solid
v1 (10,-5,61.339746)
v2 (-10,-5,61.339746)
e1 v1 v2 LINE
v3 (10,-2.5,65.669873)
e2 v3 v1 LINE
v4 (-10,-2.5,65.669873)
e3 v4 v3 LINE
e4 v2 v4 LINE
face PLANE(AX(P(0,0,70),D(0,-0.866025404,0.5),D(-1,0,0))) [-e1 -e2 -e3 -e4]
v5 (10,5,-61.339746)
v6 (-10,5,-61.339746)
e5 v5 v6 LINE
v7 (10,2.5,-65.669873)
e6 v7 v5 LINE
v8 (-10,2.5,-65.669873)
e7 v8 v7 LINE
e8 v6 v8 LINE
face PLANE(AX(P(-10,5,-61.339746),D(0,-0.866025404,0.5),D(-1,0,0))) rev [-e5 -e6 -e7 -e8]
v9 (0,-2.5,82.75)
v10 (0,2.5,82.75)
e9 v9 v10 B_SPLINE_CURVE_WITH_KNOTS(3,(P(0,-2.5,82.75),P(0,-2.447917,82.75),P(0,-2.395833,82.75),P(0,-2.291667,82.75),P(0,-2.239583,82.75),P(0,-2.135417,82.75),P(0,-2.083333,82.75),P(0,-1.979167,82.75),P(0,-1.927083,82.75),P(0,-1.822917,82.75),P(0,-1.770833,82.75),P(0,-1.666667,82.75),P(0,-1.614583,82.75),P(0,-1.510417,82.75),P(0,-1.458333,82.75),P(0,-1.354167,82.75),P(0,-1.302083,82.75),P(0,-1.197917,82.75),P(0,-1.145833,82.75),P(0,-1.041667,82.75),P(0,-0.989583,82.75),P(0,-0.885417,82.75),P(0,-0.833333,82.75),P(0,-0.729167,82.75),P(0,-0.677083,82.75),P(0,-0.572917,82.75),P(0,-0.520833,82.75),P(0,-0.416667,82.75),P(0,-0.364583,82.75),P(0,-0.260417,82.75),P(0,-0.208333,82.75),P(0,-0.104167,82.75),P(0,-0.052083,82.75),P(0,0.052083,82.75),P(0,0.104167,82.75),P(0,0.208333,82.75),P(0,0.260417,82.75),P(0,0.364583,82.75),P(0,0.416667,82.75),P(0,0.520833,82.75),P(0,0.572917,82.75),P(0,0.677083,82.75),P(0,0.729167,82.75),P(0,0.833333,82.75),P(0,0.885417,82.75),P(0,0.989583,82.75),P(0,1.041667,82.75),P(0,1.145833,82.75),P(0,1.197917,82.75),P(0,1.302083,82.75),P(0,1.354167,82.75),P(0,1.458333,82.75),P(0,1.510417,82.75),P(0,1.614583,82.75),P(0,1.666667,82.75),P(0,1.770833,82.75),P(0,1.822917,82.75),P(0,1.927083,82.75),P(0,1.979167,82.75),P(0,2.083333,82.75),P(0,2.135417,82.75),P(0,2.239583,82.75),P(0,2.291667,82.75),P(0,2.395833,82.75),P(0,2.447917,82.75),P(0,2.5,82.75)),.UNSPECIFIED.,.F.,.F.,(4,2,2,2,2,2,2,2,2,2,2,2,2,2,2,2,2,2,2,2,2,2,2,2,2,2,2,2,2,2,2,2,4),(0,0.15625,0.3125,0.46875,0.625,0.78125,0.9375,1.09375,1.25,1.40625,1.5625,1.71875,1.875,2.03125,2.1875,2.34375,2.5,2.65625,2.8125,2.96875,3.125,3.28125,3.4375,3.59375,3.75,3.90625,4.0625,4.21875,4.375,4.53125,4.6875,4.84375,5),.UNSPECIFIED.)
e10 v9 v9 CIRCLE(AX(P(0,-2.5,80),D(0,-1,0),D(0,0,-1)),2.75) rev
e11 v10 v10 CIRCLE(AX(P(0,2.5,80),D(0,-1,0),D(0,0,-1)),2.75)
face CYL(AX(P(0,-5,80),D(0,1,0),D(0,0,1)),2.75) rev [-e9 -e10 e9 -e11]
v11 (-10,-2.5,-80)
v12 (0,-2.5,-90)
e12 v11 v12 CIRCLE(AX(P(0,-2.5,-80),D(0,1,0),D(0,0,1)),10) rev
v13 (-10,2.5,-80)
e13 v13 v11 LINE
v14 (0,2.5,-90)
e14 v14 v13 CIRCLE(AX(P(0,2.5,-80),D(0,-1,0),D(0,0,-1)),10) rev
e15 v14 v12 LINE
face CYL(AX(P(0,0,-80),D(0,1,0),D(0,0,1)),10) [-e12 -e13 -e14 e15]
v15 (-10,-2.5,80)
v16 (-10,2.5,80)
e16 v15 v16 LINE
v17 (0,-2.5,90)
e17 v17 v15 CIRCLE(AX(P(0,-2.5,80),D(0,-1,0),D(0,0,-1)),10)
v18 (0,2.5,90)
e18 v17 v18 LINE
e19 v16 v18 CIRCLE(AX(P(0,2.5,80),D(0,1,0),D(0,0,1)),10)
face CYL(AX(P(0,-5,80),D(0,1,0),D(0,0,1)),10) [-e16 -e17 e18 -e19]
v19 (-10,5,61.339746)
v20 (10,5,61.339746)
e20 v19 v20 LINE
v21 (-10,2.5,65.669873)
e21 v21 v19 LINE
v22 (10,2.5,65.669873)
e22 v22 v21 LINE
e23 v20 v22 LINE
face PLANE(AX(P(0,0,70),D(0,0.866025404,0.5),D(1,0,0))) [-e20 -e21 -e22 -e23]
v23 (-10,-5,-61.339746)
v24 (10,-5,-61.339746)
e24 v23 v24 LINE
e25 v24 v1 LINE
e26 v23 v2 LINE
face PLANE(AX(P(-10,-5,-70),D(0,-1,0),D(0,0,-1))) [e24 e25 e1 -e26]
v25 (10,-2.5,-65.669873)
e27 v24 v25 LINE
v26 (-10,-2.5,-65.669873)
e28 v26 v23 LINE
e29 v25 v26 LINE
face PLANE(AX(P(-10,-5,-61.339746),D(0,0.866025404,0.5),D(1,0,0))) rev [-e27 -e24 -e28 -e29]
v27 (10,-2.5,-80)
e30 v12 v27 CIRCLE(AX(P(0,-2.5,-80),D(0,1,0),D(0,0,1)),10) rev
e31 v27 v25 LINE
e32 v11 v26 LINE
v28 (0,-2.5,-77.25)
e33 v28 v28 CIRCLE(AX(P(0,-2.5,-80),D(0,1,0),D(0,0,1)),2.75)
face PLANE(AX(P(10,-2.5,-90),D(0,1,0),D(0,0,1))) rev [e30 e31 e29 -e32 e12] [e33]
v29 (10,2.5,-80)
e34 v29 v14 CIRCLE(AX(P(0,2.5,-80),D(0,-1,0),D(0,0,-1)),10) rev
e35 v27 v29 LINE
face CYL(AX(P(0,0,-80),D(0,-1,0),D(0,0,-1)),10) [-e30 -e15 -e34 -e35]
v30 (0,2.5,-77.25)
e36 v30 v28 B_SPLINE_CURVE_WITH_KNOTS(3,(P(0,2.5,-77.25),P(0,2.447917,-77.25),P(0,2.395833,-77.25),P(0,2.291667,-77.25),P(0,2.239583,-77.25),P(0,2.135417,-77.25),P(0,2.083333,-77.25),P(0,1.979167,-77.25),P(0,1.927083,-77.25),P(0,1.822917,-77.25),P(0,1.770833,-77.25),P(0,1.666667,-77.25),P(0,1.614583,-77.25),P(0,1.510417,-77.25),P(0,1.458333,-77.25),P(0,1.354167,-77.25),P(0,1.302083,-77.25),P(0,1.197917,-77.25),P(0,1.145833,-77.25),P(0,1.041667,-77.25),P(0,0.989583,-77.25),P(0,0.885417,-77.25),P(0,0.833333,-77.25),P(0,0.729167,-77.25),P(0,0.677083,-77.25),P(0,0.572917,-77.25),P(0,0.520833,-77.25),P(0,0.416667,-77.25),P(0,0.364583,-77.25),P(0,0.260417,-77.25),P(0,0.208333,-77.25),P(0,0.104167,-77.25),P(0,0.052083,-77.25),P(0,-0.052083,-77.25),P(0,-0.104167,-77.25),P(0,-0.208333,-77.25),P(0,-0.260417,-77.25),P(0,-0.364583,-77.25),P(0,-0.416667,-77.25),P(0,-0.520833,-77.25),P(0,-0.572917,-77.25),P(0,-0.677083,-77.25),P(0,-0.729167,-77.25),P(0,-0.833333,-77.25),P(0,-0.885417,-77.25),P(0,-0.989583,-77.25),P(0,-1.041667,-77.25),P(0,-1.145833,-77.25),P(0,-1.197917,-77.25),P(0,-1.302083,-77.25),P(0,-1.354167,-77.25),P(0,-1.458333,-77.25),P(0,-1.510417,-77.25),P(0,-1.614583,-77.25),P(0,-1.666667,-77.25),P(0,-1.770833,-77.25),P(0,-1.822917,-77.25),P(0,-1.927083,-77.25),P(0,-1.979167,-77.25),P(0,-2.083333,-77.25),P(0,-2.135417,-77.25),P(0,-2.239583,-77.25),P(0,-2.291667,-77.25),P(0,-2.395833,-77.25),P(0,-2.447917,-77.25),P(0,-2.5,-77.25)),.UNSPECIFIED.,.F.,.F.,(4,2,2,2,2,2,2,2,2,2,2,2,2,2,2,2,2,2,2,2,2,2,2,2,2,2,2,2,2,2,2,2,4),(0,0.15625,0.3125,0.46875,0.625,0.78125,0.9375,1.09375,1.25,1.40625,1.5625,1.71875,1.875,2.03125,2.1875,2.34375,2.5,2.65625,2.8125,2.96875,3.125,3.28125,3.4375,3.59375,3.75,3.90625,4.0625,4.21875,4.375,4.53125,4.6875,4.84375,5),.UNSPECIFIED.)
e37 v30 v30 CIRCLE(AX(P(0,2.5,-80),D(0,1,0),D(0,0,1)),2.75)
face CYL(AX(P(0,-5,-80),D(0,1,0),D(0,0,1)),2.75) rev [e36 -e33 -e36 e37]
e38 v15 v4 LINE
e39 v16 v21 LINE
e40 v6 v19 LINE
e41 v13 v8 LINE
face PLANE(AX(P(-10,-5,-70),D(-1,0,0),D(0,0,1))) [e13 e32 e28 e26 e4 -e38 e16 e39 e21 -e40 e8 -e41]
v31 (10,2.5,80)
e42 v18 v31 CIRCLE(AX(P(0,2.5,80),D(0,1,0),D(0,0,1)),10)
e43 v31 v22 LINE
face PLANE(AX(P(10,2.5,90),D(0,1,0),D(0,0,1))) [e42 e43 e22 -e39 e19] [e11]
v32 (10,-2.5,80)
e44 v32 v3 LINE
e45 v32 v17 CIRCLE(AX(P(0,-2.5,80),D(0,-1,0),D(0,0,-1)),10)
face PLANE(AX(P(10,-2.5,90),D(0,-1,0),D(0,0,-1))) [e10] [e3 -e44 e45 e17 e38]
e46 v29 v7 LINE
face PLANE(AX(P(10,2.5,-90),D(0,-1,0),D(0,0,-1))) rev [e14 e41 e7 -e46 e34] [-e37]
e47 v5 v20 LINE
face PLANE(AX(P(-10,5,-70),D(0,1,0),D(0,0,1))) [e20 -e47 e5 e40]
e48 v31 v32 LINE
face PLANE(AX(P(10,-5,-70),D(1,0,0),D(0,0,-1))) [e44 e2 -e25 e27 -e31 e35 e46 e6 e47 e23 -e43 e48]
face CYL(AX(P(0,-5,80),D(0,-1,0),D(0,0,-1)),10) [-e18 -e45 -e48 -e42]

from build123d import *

# Parameters (mm, degrees)
BOSS_EXTRUDE1_DEPTH      = 70
BOSS_EXTRUDE1_DEPTH_BACK = 70
SKETCH1_W                = 20
SKETCH1_H                = 10
SKETCH3_W                = 20
SKETCH3_H                = 5
BOSS_EXTRUDE2_DEPTH      = 20
FILLET1_R                = 10
SKETCH4_R                = 2.75
CUT_EXTRUDE1_DEPTH       = 91.863909227
FILLET1_OF_MIRROR1_R     = 10
CHAMFER1_SIZE            = 8.660254038
CHAMFER1_SIZE_2          = 5


# Some blends are built 0.0001 mm under size
with BuildPart() as part:
    # Sketch1 → Boss-Extrude1 (new, two sides: drawn at the far end of the back side and taken through both)
    with BuildSketch(Plane.XY.offset(-BOSS_EXTRUDE1_DEPTH_BACK)):
        Rectangle(SKETCH1_W, SKETCH1_H)
    extrude(amount=BOSS_EXTRUDE1_DEPTH + BOSS_EXTRUDE1_DEPTH_BACK)

    # Sketch3 → Boss-Extrude2 (add)
    with BuildSketch(Plane(origin=(0, 0, -70), x_dir=(-1, 0, 0), z_dir=(0, 0, -1))):
        Rectangle(SKETCH3_W, SKETCH3_H)
    boss_extrude2 = extrude(amount=BOSS_EXTRUDE2_DEPTH)

    # Fillet1
    fillet1_edges = [part.edges().sort_by_distance(p)[0] for p in [
        (-10, 0, -90),
        (10, 0, -90),
    ]]
    fillet(fillet1_edges, radius=FILLET1_R - 0.0001)  # a hair under: the kernel refuses the full size

    # Sketch4 → Cut-Extrude1 (cut, through all)
    with BuildSketch(Plane(origin=(0, 2.5, 0), x_dir=(1, 0, 0), z_dir=(0, 1, 0))):
        with Locations(Location((0, 80, 0), (0, 0, 270))):
            Circle(SKETCH4_R)
    cut_extrude1 = extrude(amount=-CUT_EXTRUDE1_DEPTH, mode=Mode.SUBTRACT)

    # Mirror1: Boss-Extrude2, Cut-Extrude1 across plane
    add(boss_extrude2.mirror(Plane.XY))
    add(cut_extrude1.mirror(Plane.XY), mode=Mode.SUBTRACT)

    # Fillet1 of Mirror1
    fillet1_of_mirror1_edges = [part.edges().sort_by_distance(p)[0] for p in [
        (-10, 0, 90),
        (10, 0, 90),
    ]]
    fillet(fillet1_of_mirror1_edges, radius=FILLET1_OF_MIRROR1_R - 0.0001)  # a hair under: the kernel refuses the full size

    # Chamfer1
    # the kernel refuses this chamfer: 8.660254038, 5 mm, written as the material it takes off along each edge
    with BuildSketch(Plane(origin=(32.404819853, 5, -70), x_dir=(0, 0.019326765612700594, 0.999813220622208), z_dir=(-1, 0, 0))) as chamfer1_piece_1_section:
        Polygon((CHAMFER1_SIZE * 0.999813220604, -CHAMFER1_SIZE * 0.0193267656124), (-CHAMFER1_SIZE_2 * 0.0193267656127, -CHAMFER1_SIZE_2 * 0.999813220622), (0, 0), align=None)
    chamfer1_piece_1 = extrude(amount=64.809639706, mode=Mode.PRIVATE)
    chamfer1_piece_1 = split(chamfer1_piece_1, bisect_by=Plane(origin=(0, 2.5, -66.539331058), z_dir=(0, 1, 0)), keep=Keep.TOP, mode=Mode.PRIVATE)
    add(chamfer1_piece_1, mode=Mode.SUBTRACT)
    with BuildSketch(Plane(origin=(-32.404819853, -5, -70), x_dir=(0, -0.019326765612700594, 0.999813220622208), z_dir=(1, 0, 0))) as chamfer1_piece_2_section:
        Polygon((CHAMFER1_SIZE * 0.999813220604, -CHAMFER1_SIZE * 0.0193267656124), (-CHAMFER1_SIZE_2 * 0.0193267656127, -CHAMFER1_SIZE_2 * 0.999813220622), (0, 0), align=None)
    chamfer1_piece_2 = extrude(amount=64.809639706, mode=Mode.PRIVATE)
    chamfer1_piece_2 = split(chamfer1_piece_2, bisect_by=Plane(origin=(0, -2.5, -66.539331058), z_dir=(0, -1, 0)), keep=Keep.TOP, mode=Mode.PRIVATE)
    add(chamfer1_piece_2, mode=Mode.SUBTRACT)
    with BuildSketch(Plane(origin=(-32.404819853, -5, 70), x_dir=(0, 0.9983227437537926, 0.05789386240267045), z_dir=(1, 0, 0))) as chamfer1_piece_3_section:
        Polygon((CHAMFER1_SIZE_2 * 0.998322743754, -CHAMFER1_SIZE_2 * 0.0578938624027), (-CHAMFER1_SIZE * 0.0578938624016, -CHAMFER1_SIZE * 0.998322743736), (0, 0), align=None)
    chamfer1_piece_3 = extrude(amount=64.809639706, mode=Mode.PRIVATE)
    chamfer1_piece_3 = split(chamfer1_piece_3, bisect_by=Plane(origin=(0, -2.5, 66.539331058), z_dir=(0, -1, 0)), keep=Keep.TOP, mode=Mode.PRIVATE)
    add(chamfer1_piece_3, mode=Mode.SUBTRACT)
    with BuildSketch(Plane(origin=(32.404819853, 5, 70), x_dir=(0, -0.9983227437537926, 0.05789386240267045), z_dir=(-1, 0, 0))) as chamfer1_piece_4_section:
        Polygon((CHAMFER1_SIZE_2 * 0.998322743754, -CHAMFER1_SIZE_2 * 0.0578938624027), (-CHAMFER1_SIZE * 0.0578938624016, -CHAMFER1_SIZE * 0.998322743736), (0, 0), align=None)
    chamfer1_piece_4 = extrude(amount=64.809639706, mode=Mode.PRIVATE)
    chamfer1_piece_4 = split(chamfer1_piece_4, bisect_by=Plane(origin=(0, 2.5, 66.539331058), z_dir=(0, 1, 0)), keep=Keep.TOP, mode=Mode.PRIVATE)
    add(chamfer1_piece_4, mode=Mode.SUBTRACT)


solid = part.part
